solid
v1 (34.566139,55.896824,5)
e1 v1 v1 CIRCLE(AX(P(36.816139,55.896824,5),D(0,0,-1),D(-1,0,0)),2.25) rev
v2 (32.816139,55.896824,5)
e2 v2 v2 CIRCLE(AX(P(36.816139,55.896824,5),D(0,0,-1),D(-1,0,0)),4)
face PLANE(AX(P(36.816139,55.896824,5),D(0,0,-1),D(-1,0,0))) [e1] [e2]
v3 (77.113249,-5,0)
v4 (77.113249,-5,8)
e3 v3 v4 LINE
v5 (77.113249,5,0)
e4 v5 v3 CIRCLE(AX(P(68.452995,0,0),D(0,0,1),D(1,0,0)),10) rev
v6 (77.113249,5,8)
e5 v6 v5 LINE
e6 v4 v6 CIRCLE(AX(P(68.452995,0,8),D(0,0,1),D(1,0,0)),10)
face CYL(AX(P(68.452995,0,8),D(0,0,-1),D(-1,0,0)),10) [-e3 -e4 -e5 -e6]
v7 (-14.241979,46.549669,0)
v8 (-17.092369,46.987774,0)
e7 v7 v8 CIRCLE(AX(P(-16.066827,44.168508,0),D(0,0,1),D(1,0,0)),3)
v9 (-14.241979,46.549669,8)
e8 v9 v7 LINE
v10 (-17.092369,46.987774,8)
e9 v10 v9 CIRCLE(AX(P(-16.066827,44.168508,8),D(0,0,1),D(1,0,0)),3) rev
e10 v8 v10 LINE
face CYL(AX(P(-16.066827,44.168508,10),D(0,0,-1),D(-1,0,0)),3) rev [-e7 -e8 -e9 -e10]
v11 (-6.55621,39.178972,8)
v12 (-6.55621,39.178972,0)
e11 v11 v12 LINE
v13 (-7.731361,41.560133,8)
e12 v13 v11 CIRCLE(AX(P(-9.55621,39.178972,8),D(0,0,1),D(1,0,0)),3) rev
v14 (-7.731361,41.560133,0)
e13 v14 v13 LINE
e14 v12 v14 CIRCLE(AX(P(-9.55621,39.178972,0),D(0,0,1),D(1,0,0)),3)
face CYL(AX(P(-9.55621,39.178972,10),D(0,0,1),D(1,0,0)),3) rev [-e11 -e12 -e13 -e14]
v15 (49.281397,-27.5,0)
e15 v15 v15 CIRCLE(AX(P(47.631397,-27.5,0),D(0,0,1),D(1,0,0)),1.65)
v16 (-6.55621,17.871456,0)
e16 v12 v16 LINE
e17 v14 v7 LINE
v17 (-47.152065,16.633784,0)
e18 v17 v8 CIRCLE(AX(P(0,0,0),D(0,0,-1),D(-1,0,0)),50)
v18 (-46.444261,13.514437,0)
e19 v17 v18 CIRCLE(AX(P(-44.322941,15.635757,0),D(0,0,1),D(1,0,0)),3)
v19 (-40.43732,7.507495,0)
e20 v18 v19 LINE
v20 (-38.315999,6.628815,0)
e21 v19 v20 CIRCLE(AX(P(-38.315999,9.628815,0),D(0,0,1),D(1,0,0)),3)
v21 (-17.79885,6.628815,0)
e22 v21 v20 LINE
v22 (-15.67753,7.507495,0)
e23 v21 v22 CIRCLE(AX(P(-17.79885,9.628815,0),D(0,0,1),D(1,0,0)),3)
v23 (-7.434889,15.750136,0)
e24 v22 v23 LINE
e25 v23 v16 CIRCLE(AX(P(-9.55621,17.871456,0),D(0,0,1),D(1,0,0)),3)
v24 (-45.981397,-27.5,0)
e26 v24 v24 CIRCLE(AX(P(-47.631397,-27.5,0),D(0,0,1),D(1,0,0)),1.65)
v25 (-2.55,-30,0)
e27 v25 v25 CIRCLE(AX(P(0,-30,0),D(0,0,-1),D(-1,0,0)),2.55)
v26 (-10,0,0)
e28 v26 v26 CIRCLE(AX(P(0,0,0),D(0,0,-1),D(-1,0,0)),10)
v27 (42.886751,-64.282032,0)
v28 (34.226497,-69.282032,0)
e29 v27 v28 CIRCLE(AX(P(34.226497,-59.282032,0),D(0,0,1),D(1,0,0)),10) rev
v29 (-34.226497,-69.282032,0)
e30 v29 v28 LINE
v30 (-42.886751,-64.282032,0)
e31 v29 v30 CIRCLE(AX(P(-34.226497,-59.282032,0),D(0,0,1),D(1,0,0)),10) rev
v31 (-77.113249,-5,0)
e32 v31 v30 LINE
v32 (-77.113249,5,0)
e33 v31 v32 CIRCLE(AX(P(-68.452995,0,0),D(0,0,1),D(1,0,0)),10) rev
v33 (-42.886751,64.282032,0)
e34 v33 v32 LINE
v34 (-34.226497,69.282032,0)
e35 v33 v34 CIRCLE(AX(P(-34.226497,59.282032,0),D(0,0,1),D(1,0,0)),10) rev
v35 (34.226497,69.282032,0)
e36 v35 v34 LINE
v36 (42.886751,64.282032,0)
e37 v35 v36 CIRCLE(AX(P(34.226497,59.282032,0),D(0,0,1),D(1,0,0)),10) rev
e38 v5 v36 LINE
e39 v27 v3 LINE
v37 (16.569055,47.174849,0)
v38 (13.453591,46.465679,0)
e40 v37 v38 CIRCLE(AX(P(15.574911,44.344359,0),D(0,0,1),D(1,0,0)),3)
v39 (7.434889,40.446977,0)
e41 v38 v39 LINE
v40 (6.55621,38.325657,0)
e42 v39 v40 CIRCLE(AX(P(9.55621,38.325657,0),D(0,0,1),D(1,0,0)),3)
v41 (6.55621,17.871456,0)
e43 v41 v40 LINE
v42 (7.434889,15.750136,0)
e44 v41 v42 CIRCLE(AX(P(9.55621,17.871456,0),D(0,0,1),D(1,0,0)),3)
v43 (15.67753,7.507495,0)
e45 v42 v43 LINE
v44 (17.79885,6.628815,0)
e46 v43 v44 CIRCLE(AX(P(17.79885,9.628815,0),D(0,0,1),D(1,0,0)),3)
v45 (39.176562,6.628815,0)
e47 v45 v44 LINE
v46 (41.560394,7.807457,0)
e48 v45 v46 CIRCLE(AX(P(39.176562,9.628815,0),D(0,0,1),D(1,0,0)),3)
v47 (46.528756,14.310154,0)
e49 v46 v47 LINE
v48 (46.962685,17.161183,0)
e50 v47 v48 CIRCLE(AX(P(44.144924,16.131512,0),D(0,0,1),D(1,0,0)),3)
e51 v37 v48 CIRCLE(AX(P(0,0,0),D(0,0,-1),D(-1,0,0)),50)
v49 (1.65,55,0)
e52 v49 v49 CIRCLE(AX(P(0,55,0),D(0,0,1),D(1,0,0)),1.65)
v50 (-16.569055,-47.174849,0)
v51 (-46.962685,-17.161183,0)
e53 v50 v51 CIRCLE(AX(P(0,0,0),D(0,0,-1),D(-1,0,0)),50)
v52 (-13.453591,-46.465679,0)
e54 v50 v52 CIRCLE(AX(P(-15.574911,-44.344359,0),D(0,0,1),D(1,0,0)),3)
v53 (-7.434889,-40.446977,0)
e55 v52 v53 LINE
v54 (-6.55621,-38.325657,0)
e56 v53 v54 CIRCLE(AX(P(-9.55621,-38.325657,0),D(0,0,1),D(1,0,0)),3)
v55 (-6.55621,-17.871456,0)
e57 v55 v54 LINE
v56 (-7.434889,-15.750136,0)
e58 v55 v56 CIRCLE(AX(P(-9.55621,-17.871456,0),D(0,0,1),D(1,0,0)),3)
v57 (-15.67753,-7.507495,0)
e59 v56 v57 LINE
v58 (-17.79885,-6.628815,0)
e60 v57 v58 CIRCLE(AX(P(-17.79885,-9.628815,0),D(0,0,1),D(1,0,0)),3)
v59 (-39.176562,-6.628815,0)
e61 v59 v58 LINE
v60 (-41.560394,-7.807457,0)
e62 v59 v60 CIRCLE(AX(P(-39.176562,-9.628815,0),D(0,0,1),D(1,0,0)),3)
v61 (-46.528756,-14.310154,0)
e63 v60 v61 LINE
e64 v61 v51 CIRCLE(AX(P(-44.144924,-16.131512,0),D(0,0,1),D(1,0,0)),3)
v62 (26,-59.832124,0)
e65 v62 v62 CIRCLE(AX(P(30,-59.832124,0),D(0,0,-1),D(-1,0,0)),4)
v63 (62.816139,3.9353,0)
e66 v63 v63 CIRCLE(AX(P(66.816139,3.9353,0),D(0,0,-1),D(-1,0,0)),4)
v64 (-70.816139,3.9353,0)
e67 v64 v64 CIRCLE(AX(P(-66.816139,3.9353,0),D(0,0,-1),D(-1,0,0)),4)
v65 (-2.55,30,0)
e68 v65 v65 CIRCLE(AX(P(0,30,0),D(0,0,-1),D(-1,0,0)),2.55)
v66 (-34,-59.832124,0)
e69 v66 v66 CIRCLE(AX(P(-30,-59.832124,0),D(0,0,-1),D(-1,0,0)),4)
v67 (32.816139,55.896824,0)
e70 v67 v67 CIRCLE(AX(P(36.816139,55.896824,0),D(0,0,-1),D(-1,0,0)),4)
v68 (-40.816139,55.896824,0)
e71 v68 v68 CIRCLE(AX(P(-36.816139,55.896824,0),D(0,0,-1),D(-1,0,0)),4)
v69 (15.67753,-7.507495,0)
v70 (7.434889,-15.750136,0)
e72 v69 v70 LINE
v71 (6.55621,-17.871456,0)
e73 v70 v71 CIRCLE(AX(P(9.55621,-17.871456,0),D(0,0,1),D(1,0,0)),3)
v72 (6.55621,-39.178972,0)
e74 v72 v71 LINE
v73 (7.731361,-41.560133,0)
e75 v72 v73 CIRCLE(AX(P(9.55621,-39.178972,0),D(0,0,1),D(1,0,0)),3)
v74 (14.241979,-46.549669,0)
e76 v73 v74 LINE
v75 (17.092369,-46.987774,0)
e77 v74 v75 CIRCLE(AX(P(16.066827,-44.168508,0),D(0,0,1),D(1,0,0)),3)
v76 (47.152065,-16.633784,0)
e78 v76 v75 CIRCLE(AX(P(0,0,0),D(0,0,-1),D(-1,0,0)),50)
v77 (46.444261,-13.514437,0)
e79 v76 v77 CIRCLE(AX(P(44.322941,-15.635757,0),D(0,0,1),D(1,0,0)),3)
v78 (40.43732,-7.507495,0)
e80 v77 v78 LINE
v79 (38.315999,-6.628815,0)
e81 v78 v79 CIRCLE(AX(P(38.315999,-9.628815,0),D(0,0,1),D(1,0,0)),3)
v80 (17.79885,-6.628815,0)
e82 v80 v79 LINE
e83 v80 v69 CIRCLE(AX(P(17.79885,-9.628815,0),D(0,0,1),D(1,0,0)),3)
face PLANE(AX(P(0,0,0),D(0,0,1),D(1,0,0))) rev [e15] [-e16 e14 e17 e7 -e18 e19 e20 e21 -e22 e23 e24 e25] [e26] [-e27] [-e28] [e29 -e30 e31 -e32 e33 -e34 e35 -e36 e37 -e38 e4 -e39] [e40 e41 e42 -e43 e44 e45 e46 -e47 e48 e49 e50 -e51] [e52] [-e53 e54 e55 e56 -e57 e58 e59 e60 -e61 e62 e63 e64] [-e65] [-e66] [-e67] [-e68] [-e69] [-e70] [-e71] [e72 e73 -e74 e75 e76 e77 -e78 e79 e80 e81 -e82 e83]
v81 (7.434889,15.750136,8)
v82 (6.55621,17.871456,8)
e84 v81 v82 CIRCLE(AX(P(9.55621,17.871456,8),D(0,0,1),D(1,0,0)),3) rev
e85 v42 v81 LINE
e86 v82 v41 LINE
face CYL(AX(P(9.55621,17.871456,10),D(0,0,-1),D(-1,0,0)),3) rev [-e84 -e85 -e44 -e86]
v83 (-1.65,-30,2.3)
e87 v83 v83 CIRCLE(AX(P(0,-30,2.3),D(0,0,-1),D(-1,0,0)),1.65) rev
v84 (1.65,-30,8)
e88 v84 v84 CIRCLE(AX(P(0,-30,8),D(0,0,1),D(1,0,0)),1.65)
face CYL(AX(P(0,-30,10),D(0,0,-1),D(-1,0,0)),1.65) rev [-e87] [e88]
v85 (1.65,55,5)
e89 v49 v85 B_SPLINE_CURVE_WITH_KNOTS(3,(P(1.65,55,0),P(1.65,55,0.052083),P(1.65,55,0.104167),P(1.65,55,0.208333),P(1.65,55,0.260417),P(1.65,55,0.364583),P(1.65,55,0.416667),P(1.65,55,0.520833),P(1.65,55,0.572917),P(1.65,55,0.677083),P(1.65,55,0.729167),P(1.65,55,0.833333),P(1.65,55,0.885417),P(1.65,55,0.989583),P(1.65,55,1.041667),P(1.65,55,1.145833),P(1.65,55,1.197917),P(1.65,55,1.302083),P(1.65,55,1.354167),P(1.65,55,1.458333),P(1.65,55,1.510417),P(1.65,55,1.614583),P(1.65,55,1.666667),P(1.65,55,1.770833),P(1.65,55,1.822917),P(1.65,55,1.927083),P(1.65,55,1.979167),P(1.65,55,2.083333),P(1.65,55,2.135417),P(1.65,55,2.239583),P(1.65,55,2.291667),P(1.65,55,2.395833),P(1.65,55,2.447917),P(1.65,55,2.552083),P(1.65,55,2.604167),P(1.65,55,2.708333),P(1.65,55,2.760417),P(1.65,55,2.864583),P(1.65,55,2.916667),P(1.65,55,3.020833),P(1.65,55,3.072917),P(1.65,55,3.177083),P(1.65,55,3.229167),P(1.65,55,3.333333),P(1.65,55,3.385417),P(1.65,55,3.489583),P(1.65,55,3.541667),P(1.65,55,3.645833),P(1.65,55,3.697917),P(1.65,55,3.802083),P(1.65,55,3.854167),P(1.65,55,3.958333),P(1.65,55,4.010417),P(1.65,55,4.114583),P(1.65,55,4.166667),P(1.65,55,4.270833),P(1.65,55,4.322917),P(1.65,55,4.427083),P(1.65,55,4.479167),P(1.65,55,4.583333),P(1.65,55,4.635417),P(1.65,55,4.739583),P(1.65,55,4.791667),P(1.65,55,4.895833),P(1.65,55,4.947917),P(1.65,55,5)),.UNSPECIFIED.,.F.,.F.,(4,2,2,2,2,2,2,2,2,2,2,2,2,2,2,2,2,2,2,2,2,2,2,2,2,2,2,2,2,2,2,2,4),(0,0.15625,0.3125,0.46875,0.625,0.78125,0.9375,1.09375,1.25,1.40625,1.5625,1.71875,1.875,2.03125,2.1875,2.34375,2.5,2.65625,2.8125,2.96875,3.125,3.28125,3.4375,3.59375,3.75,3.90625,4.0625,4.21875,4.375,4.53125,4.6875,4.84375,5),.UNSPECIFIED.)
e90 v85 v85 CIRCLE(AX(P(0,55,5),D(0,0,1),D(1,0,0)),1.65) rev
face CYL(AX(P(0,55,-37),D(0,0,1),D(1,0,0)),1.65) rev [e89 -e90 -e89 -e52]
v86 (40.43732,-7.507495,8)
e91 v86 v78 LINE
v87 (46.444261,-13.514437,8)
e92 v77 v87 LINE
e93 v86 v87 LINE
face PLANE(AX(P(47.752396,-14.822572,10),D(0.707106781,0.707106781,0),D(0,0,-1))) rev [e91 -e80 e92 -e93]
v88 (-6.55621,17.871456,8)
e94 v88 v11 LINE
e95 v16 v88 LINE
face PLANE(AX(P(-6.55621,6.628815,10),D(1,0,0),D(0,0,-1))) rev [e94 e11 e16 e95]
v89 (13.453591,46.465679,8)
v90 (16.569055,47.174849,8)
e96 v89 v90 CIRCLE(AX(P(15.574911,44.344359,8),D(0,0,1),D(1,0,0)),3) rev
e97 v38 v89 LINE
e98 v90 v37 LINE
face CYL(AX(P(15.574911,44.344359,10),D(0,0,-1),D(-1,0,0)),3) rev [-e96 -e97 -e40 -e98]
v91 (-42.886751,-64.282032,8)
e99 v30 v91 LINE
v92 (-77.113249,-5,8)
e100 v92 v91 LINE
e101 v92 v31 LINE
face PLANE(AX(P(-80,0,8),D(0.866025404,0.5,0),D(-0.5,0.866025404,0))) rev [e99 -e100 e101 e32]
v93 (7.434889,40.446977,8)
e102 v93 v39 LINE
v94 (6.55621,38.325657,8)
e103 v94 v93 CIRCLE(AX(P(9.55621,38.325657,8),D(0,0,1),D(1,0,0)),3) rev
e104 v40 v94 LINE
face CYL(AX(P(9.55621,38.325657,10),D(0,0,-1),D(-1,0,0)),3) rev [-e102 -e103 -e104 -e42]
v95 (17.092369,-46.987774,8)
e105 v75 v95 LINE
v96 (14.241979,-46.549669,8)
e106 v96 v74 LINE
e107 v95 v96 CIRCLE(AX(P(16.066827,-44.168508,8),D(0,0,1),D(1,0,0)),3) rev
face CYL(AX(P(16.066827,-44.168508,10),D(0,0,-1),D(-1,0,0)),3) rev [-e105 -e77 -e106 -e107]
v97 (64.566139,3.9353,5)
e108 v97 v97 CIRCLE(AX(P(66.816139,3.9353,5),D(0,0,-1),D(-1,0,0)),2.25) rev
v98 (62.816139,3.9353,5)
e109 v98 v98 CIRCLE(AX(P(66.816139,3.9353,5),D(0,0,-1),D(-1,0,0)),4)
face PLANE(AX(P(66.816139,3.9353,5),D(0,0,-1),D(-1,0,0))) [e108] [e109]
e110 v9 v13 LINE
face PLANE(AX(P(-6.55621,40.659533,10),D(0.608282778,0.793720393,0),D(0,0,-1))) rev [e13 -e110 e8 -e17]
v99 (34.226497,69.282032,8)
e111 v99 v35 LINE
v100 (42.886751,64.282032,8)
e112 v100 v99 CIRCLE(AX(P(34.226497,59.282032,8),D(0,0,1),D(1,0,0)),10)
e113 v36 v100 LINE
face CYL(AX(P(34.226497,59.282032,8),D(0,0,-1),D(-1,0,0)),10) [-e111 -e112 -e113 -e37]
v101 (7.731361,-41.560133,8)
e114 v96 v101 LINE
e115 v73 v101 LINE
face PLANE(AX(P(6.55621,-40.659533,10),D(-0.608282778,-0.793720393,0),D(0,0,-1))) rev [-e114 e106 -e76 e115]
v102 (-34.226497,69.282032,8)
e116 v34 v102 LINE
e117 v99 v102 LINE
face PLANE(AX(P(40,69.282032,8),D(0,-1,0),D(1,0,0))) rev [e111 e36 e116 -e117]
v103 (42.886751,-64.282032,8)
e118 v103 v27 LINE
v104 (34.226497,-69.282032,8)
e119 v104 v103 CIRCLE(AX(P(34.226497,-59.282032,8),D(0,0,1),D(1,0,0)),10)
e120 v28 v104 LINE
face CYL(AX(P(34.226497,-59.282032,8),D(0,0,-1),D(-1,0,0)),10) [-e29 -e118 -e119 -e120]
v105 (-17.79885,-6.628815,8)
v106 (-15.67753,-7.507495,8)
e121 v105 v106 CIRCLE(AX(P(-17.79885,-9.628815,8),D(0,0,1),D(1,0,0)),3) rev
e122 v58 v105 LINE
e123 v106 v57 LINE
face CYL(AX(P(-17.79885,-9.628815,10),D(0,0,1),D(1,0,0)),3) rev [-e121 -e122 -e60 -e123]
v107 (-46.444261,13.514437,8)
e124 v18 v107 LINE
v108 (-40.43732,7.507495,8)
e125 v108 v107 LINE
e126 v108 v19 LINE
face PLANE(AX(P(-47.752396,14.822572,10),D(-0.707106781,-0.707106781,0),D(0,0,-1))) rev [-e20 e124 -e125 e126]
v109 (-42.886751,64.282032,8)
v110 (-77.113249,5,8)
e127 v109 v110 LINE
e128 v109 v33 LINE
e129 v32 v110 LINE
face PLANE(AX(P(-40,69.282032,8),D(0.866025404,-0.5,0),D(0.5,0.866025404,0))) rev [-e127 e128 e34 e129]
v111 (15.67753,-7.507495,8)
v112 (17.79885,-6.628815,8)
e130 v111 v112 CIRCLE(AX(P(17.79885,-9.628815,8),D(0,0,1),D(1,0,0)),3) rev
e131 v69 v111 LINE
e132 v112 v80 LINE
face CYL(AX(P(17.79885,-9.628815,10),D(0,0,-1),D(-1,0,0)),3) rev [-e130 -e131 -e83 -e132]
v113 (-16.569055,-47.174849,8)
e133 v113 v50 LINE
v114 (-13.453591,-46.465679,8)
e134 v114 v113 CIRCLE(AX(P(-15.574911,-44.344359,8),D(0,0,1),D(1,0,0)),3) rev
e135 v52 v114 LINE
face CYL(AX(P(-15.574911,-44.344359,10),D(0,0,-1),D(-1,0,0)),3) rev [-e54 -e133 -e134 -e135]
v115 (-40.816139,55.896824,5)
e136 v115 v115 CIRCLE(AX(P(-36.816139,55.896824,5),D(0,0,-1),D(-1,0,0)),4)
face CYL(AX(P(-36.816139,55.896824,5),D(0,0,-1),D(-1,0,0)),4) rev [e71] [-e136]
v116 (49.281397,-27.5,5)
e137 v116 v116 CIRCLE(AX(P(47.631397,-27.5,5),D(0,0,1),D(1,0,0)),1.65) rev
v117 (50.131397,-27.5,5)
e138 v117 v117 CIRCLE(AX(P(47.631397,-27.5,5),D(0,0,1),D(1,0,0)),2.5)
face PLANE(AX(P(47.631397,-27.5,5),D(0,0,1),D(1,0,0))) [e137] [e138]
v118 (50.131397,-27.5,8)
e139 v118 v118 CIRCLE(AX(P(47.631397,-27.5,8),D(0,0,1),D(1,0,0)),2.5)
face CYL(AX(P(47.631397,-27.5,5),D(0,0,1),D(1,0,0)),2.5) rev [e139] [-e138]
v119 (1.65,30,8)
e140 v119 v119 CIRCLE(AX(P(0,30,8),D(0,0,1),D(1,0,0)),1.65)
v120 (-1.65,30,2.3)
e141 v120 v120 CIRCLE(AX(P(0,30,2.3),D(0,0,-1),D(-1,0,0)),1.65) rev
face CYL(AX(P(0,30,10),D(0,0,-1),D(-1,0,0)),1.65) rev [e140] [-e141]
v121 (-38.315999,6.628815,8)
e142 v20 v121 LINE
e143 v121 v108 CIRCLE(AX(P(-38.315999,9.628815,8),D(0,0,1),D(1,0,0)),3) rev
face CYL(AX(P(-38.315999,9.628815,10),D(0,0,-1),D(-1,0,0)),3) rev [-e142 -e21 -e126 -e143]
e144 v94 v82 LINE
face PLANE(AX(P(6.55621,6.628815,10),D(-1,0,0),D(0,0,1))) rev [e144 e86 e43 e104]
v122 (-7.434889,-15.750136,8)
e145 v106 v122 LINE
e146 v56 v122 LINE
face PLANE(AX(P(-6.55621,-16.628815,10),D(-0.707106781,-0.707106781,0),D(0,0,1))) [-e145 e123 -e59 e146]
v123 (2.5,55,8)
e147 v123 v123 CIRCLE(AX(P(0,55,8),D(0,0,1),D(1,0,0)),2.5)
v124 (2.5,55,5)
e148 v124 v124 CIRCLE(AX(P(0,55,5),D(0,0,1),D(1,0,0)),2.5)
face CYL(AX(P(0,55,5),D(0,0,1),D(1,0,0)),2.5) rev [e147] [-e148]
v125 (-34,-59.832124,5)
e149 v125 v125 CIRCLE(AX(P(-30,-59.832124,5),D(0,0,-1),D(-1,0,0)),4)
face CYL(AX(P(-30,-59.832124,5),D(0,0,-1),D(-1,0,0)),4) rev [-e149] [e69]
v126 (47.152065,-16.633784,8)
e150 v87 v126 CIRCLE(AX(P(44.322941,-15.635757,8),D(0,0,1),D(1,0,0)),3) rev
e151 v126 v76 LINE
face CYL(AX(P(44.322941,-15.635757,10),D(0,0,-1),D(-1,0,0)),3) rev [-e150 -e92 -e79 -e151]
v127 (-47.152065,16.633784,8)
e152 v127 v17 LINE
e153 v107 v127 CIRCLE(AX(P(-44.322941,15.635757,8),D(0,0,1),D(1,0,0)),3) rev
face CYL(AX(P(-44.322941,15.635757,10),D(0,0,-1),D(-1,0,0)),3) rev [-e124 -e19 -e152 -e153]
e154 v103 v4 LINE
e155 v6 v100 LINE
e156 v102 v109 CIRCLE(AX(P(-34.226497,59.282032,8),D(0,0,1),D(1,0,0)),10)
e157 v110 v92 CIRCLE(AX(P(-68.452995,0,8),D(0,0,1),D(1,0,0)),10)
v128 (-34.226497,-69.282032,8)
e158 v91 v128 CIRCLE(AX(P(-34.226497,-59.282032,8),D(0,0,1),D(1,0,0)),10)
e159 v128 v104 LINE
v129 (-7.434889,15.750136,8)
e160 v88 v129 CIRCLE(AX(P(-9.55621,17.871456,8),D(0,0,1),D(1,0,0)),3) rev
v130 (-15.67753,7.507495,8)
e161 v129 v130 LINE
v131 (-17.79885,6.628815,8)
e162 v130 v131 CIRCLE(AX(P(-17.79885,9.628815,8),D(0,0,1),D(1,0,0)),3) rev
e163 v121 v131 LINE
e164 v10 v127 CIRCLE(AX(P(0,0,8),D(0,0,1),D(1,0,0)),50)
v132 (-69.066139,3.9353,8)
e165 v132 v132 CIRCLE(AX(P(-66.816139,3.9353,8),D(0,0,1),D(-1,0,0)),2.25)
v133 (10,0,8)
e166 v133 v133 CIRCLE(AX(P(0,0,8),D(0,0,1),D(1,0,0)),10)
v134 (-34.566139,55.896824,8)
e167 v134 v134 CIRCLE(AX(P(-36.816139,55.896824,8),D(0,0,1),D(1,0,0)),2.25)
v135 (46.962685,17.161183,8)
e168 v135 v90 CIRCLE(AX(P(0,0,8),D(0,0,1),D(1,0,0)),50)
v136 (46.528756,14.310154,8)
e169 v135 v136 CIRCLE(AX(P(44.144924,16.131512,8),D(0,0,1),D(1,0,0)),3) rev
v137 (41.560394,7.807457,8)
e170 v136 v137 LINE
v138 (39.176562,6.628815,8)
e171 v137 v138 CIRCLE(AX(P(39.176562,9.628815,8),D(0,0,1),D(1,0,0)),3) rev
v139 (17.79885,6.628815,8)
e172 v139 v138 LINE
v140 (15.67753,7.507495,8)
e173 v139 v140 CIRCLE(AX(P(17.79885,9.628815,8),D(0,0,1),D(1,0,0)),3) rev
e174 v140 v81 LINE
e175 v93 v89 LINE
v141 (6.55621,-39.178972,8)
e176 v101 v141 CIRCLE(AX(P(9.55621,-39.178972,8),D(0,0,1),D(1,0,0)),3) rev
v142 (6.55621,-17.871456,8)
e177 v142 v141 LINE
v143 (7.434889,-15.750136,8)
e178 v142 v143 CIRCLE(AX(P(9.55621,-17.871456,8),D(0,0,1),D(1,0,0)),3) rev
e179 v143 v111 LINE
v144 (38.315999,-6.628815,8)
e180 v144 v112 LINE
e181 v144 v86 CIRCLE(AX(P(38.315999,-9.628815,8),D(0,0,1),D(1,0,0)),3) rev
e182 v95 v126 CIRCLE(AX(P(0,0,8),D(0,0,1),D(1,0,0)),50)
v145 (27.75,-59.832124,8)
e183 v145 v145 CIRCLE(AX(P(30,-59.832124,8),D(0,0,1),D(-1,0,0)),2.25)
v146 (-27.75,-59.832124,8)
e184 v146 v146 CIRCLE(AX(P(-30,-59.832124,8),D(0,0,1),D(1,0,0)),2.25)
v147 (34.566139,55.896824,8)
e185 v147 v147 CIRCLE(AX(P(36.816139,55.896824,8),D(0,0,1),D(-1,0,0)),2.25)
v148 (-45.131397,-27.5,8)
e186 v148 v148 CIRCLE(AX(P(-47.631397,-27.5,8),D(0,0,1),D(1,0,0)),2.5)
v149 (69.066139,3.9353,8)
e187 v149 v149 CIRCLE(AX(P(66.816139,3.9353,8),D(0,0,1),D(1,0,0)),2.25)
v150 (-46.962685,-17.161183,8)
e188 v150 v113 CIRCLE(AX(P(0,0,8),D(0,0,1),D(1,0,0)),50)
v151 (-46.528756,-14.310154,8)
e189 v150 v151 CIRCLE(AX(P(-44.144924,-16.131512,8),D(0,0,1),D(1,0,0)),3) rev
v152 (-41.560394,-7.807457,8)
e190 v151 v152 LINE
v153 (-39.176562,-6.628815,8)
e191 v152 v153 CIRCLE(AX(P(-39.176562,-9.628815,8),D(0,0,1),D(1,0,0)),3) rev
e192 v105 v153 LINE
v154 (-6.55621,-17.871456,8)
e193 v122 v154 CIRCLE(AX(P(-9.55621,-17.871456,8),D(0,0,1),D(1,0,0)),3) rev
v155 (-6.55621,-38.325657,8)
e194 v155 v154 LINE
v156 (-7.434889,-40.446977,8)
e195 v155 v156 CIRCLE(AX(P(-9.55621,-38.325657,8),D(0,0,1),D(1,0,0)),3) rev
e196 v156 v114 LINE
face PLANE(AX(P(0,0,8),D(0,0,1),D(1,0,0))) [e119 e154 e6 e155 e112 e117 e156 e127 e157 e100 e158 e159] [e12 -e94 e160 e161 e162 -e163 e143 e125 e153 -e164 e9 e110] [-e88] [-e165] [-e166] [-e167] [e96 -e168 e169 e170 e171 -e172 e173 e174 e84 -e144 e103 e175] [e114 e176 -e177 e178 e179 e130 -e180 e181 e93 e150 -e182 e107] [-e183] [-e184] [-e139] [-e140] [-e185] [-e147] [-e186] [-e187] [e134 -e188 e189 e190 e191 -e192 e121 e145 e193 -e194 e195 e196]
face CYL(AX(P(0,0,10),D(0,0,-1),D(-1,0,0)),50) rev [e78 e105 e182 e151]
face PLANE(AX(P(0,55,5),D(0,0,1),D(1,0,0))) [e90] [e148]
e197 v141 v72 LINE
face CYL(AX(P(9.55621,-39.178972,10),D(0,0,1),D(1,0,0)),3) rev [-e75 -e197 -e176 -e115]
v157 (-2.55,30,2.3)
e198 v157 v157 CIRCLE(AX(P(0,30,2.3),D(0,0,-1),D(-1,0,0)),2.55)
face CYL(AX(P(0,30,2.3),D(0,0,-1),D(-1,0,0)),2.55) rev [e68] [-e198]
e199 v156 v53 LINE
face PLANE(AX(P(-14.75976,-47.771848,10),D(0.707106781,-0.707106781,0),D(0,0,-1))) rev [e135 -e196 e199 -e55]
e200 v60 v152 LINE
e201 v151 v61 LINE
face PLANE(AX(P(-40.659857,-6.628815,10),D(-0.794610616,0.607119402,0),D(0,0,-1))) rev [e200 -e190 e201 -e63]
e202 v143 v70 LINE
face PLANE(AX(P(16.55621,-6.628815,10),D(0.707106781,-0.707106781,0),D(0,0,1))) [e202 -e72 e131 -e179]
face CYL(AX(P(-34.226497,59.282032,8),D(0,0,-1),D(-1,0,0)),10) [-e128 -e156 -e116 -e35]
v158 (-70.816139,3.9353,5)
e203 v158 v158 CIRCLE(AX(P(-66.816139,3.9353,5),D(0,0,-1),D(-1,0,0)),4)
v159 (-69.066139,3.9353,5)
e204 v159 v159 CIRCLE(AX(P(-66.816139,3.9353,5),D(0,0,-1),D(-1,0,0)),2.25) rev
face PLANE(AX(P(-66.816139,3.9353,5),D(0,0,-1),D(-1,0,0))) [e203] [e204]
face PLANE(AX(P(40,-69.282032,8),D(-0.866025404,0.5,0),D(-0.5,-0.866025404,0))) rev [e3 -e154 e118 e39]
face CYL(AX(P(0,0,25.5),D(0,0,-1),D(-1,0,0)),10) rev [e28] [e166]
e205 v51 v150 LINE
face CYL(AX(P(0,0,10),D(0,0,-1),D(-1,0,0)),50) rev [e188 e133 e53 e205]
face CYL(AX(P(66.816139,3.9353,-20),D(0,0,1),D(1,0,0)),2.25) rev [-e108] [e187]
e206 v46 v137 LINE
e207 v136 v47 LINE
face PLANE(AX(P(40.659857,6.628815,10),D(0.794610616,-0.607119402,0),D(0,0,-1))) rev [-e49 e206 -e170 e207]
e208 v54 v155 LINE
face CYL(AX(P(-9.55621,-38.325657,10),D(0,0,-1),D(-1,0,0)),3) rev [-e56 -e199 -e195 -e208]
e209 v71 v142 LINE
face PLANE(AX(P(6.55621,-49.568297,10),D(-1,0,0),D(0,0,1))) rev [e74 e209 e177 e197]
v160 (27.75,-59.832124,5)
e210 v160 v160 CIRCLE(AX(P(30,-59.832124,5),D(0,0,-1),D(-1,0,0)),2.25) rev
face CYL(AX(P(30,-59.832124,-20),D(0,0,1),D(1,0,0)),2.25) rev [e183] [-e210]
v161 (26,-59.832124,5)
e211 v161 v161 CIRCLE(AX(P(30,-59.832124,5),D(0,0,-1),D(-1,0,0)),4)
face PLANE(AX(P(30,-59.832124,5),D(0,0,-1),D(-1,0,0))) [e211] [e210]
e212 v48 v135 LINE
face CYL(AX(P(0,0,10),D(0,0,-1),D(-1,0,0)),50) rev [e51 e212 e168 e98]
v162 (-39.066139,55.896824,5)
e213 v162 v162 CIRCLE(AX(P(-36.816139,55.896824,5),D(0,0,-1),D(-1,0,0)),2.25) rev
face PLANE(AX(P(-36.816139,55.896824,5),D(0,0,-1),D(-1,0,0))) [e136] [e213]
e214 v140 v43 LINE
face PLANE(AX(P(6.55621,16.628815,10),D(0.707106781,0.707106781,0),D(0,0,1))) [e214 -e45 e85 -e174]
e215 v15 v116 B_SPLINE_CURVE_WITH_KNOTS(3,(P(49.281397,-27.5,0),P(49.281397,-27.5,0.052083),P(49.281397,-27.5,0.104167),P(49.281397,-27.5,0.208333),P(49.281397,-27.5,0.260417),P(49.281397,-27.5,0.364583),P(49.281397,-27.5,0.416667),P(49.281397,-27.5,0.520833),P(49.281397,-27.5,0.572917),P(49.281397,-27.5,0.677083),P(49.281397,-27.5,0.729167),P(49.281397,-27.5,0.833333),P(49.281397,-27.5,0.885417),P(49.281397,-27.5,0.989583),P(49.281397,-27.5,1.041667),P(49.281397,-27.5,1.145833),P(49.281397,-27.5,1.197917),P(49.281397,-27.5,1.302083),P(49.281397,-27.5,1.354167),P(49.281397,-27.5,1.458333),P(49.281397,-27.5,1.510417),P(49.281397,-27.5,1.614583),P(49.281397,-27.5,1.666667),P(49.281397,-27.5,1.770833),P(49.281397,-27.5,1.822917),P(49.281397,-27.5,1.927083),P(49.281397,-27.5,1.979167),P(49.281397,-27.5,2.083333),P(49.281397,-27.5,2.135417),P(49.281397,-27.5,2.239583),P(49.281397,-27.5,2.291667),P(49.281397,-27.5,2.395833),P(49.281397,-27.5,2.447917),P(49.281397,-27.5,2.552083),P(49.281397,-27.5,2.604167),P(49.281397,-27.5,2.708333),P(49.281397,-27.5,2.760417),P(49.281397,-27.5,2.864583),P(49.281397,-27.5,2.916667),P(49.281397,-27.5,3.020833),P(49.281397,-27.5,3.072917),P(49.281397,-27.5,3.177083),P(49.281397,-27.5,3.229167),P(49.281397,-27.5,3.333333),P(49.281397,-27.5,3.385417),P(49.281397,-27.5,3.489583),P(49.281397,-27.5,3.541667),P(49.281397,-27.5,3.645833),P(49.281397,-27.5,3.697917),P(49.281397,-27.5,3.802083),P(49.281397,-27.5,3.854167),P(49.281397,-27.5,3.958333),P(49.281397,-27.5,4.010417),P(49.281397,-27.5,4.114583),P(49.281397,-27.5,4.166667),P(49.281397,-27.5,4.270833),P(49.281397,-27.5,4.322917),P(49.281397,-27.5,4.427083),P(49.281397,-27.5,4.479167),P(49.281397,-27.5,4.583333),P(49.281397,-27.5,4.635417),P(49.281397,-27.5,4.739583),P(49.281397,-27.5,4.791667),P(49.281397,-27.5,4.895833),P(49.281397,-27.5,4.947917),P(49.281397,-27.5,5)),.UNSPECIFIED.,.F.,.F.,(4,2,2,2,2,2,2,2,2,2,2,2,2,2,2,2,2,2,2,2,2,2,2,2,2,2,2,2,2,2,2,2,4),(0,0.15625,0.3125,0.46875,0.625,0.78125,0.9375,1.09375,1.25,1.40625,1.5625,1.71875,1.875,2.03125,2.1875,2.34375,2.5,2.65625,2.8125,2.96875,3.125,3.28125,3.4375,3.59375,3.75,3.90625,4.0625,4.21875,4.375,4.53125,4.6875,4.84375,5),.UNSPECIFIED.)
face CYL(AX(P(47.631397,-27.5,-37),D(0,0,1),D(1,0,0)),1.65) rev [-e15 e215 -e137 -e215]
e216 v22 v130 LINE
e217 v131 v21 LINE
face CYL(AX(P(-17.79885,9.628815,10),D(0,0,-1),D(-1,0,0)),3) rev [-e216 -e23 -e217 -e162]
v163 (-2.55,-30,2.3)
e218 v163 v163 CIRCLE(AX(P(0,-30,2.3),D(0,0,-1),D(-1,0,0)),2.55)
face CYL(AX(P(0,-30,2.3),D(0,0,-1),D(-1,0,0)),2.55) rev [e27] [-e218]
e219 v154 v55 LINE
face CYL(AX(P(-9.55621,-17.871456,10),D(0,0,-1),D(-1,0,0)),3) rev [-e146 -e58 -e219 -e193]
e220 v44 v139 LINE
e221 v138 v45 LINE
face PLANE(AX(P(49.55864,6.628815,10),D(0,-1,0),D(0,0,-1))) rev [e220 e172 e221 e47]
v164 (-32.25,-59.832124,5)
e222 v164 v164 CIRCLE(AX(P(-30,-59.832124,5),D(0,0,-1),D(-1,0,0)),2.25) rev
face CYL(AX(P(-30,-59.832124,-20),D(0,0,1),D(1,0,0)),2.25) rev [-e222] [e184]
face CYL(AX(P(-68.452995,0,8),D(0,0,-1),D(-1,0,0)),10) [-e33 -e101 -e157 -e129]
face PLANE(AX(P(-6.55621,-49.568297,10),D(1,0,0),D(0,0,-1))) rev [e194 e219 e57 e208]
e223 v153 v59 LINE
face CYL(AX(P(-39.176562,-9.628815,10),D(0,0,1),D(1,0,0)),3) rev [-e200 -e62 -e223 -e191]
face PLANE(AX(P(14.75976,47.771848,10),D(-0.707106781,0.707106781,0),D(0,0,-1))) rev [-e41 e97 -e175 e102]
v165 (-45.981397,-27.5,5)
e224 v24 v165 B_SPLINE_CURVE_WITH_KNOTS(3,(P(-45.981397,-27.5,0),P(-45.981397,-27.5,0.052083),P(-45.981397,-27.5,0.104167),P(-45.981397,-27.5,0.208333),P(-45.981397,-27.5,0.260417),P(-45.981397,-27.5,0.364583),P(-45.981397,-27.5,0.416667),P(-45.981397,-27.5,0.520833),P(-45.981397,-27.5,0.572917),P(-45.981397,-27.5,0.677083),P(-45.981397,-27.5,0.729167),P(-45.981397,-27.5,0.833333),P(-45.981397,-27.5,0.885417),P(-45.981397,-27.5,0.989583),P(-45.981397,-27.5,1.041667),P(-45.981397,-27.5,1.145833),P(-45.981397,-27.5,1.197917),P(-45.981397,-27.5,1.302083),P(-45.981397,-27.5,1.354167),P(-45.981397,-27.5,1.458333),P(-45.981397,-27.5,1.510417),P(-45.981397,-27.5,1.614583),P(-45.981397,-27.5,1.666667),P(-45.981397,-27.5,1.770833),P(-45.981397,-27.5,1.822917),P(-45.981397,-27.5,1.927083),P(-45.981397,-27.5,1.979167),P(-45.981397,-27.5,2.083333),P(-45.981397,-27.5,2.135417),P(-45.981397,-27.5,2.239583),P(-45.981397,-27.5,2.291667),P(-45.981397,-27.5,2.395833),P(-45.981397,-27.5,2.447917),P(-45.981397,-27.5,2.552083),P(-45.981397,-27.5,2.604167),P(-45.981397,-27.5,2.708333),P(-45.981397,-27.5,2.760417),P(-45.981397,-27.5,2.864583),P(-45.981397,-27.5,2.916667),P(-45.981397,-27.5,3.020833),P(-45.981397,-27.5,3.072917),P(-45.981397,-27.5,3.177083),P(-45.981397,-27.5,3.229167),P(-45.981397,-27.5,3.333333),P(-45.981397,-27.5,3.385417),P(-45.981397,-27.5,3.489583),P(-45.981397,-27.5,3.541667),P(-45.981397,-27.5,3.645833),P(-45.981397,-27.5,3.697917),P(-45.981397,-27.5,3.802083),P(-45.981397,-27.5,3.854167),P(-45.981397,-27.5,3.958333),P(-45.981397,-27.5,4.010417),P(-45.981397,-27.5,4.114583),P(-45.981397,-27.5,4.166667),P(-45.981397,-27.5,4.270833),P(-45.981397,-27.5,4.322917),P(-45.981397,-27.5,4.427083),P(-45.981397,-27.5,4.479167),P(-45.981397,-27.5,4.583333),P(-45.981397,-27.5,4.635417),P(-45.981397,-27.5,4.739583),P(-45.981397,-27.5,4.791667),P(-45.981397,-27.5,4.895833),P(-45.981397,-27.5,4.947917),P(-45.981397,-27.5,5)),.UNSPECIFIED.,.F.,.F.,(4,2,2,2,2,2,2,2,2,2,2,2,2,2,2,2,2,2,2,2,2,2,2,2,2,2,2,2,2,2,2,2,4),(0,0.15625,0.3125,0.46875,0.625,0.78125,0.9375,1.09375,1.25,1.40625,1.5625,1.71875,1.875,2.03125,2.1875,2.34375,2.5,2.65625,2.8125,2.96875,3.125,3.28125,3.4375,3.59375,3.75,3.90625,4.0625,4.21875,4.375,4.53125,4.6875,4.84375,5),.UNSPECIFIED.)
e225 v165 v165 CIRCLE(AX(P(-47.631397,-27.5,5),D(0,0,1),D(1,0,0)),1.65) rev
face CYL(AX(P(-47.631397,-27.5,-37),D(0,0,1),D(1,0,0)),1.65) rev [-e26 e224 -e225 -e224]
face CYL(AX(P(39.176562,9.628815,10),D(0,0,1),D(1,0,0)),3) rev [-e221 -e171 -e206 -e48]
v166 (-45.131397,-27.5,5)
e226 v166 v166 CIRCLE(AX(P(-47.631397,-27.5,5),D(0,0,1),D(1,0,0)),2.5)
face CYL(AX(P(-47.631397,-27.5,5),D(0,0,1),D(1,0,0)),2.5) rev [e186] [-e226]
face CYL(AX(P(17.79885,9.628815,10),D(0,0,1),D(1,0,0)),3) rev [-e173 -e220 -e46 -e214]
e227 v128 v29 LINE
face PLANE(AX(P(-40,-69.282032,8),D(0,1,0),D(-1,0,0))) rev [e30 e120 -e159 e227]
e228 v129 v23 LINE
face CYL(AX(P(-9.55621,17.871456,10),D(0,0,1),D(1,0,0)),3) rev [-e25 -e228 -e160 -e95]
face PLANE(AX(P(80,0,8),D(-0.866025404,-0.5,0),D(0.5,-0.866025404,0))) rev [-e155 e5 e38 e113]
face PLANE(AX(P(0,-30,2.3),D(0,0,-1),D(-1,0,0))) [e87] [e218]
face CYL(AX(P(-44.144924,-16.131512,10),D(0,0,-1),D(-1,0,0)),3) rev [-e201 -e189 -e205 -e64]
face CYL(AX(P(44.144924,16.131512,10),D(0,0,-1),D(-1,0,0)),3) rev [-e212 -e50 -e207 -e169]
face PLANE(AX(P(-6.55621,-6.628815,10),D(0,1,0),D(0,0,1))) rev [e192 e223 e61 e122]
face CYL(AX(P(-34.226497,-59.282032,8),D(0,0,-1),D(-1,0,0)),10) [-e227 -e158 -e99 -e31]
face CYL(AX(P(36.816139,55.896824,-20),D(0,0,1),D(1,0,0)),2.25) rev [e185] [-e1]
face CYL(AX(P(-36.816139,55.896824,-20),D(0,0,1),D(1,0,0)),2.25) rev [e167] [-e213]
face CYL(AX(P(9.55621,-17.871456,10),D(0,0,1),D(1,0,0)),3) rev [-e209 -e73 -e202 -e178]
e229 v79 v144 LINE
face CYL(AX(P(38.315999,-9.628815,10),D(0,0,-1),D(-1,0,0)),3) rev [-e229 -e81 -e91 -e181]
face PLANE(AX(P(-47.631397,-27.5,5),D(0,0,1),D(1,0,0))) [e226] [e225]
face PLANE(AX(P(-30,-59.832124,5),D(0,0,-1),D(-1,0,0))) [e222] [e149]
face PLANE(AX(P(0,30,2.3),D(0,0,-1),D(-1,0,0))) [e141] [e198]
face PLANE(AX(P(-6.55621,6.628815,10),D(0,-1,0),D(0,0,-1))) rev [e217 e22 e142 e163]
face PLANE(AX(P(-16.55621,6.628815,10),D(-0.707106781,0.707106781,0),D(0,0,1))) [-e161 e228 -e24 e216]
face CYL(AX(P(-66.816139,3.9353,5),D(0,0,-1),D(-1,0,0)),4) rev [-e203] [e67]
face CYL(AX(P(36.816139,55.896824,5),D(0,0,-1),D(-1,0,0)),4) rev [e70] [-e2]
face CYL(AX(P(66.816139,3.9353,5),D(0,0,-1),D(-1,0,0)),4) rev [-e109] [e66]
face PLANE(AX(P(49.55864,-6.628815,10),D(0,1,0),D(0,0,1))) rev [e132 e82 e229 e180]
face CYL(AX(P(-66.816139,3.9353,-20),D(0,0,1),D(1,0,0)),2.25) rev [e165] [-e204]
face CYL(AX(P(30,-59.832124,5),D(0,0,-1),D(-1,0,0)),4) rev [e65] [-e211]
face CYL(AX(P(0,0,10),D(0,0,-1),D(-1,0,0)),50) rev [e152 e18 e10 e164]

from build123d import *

# Parameters (mm, degrees)
BOSS_EXTRUDE1_DEPTH = 8
SKETCH2_R           = 2.25
CUT_EXTRUDE1_DEPTH  = 28
FILLET1_R           = 10
SKETCH5_R           = 1.65
CUT_EXTRUDE3_DEPTH  = 45
SKETCH10_R          = 4
CUT_EXTRUDE4_DEPTH  = 5
CUT_EXTRUDE5_DEPTH  = 10
CHAMFER1_SIZE       = 8.908764189
CHAMFER1_SIZE_2     = 10
CHAMFER1_SIZE_3     = 8.898783464
SKETCH12_R          = 10
CUT_EXTRUDE6_DEPTH  = 25.5
SKETCH13_R          = 1.65
CUT_EXTRUDE7_DEPTH  = 10
SKETCH14_R          = 2.55
CUT_EXTRUDE8_DEPTH  = 2.3
FILLET2_R           = 3
SKETCH15_R          = 2.5
CUT_EXTRUDE9_DEPTH  = 3


with BuildPart() as part:
    # Sketch1 → Boss-Extrude1 (new body)
    with BuildSketch(Plane.XY):
        Polygon((40, 69.282032303), (-40, 69.282032303), (-80, 0), (-40, -69.282032303), (40, -69.282032303), (80, 0), align=None)
    extrude(amount=BOSS_EXTRUDE1_DEPTH)

    # Sketch2 → Cut-Extrude1 (cut)
    with BuildSketch(Plane.XY.offset(8)):
        with Locations((-36.81613895, 55.896823885)):
            Circle(SKETCH2_R)
        with Locations((-66.81613895, 3.935299658)):
            Circle(SKETCH2_R)
        with Locations((36.81613895, 55.896823885)):
            Circle(SKETCH2_R)
        with Locations((66.81613895, 3.935299658)):
            Circle(SKETCH2_R)
        with Locations((30, -59.832123543)):
            Circle(SKETCH2_R)
        with Locations((-30, -59.832123543)):
            Circle(SKETCH2_R)
    extrude(amount=-CUT_EXTRUDE1_DEPTH, mode=Mode.SUBTRACT)

    # Fillet1
    fillet1_edges = [part.edges().sort_by_distance(p)[0] for p in [
        (80, 0, 4),
        (40, -69.282032303, 4),
        (-40, -69.282032303, 4),
        (-80, 0, 4),
        (-40, 69.282032303, 4),
        (40, 69.282032303, 4),
    ]]
    fillet(fillet1_edges, radius=FILLET1_R)

    # Sketch5 → Cut-Extrude3 (cut)
    with BuildSketch(Plane.XY.offset(8)):
        with Locations((0, 55)):
            Circle(SKETCH5_R)
        with Locations((47.631397208, -27.5)):
            Circle(SKETCH5_R)
        with Locations((-47.631397208, -27.5)):
            Circle(SKETCH5_R)
    extrude(amount=-CUT_EXTRUDE3_DEPTH, mode=Mode.SUBTRACT)

    # Sketch10 → Cut-Extrude4 (cut)
    with BuildSketch(Plane(origin=(0, 0, 0), x_dir=(-1, 0, 0), z_dir=(0, 0, -1))):
        with Locations((-30, -59.832123543)):
            Circle(SKETCH10_R)
        with Locations((-66.81613895, 3.935299658)):
            Circle(SKETCH10_R)
        with Locations((-36.81613895, 55.896823885)):
            Circle(SKETCH10_R)
        with Locations((36.81613895, 55.896823885)):
            Circle(SKETCH10_R)
        with Locations((66.81613895, 3.935299658)):
            Circle(SKETCH10_R)
        with Locations((30, -59.832123543)):
            Circle(SKETCH10_R)
    extrude(amount=-CUT_EXTRUDE4_DEPTH, mode=Mode.SUBTRACT)

    # Sketch11 → Cut-Extrude5 (cut)
    with BuildSketch(Plane(origin=(0, 0, 0), x_dir=(-1, 0, 0), z_dir=(0, 0, -1))):
        with BuildLine():
            Line((-6.556209751, -49.568297466), (-6.556209751, -6.628815438))
            Line((-6.556209751, -6.628815438), (-49.558640073, -6.628815438))
            ThreePointArc((-49.558640073, -6.628815438), (-35.329433507, -35.381225644), (-6.556209751, -49.568297466))
        make_face()
        with BuildLine():
            Line((6.556209751, -49.568297466), (6.556209751, -6.628815438))
            Line((6.556209751, -6.628815438), (49.558640073, -6.628815438))
            ThreePointArc((49.558640073, -6.628815438), (35.329433507, -35.381225644), (6.556209751, -49.568297466))
        make_face()
        with BuildLine():
            Line((-49.558640073, 6.628815438), (-6.556209751, 6.628815438))
            Line((-6.556209751, 6.628815438), (-6.556209751, 49.568297466))
            ThreePointArc((-6.556209751, 49.568297466), (-35.329433507, 35.381225644), (-49.558640073, 6.628815438))
        make_face()
        with BuildLine():
            Line((6.556209751, 6.628815438), (49.558640073, 6.628815438))
            ThreePointArc((49.558640073, 6.628815438), (35.329433507, 35.381225644), (6.556209751, 49.568297466))
            Line((6.556209751, 49.568297466), (6.556209751, 6.628815438))
        make_face()
    extrude(amount=-CUT_EXTRUDE5_DEPTH, mode=Mode.SUBTRACT)

    # Chamfer1
    # the kernel refuses this chamfer: 10, 8.908764189, 8.898783464 mm, written as the material it adds along each edge
    with BuildSketch(Plane(origin=(-6.556209751, 49.568297466, 0), x_dir=(-0.9751121847064436, -0.22171203674367113, 0), z_dir=(0, 0, 1)), Plane(origin=(6.556209751, -49.568297466, 0), x_dir=(0.9751121847064436, 0.22171203674367113, 0), z_dir=(0, 0, 1))) as chamfer1_piece_1:
        with BuildLine():
            Line((9.19369635, 0), (CHAMFER1_SIZE * 0.221712036732, CHAMFER1_SIZE * 0.975112184657))
            Line((CHAMFER1_SIZE * 0.221712036732, CHAMFER1_SIZE * 0.975112184657), (0, 0))
            ThreePointArc((0, 0), (4.724816594, -0.211594789), (9.19369635, 0))
        make_face()
    extrude(amount=8)
    with BuildSketch(Plane(origin=(-49.558640073, 6.628815438, 0), x_dir=(0.2152729733414999, 0.9765539139999951, 0), z_dir=(0, 0, 1)), Plane(origin=(49.558640073, -6.628815438, 0), x_dir=(-0.2152729733414999, -0.9765539139999951, 0), z_dir=(0, 0, 1))) as chamfer1_piece_2:
        with BuildLine():
            Line((8.390480284, 0), (CHAMFER1_SIZE_2 * 0.215272973341, -CHAMFER1_SIZE_2 * 0.976553914))
            Line((CHAMFER1_SIZE_2 * 0.215272973341, -CHAMFER1_SIZE_2 * 0.976553914), (0, 0))
            ThreePointArc((0, 0), (4.30291799, 0.17619531), (8.390480284, 0))
        make_face()
    extrude(amount=8)
    with BuildSketch(Plane(origin=(-6.556209751, 6.628815438, 0), x_dir=(-1, 0, 0), z_dir=(0, 0, 1)), Plane(origin=(-6.556209751, -6.628815438, 0), x_dir=(0, -1, 0), z_dir=(0, 0, 1)), Plane(origin=(6.556209751, -6.628815438, 0), x_dir=(1, 0, 0), z_dir=(0, 0, 1)), Plane(origin=(6.556209751, 6.628815438, 0), x_dir=(0, 1, 0), z_dir=(0, 0, 1))) as chamfer1_piece_3:
        Polygon((CHAMFER1_SIZE_2, 0), (0, -CHAMFER1_SIZE_2), (0, 0), align=None)
    extrude(amount=8)
    with BuildSketch(Plane(origin=(-49.558640073, -6.628815438, 0), x_dir=(0.22314024310111003, -0.9747863519298869, 0), z_dir=(0, 0, 1))) as chamfer1_piece_4:
        with BuildLine():
            Line((9.19369635, 0), (CHAMFER1_SIZE_3 * 0.223140243107, CHAMFER1_SIZE_3 * 0.974786351955))
            Line((CHAMFER1_SIZE_3 * 0.223140243107, CHAMFER1_SIZE_3 * 0.974786351955), (0, 0))
            ThreePointArc((0, 0), (4.724816594, -0.211594789), (9.19369635, 0))
        make_face()
    extrude(amount=8)
    with BuildSketch(Plane(origin=(-6.556209751, -49.568297466, 0), x_dir=(-0.9768521989550364, 0.21391536035710523, 0), z_dir=(0, 0, 1))) as chamfer1_piece_5:
        with BuildLine():
            Line((8.397944605, 0), (CHAMFER1_SIZE_2 * 0.213915360357, -CHAMFER1_SIZE_2 * 0.976852198955))
            Line((CHAMFER1_SIZE_2 * 0.213915360357, -CHAMFER1_SIZE_2 * 0.976852198955), (0, 0))
            ThreePointArc((0, 0), (4.306885367, 0.176509198), (8.397944605, 0))
        make_face()
    extrude(amount=8)
    with BuildSketch(Plane(origin=(6.556209751, 49.568297466, 0), x_dir=(0, -1, 0), z_dir=(0, 0, 1))) as chamfer1_piece_6:
        with BuildLine():
            Line((CHAMFER1_SIZE_2, 0), (1.796449346, 8.203550654))
            ThreePointArc((1.796449346, 8.203550654), (0.748885537, 4.24494847), (0, 0))
            Line((0, 0), (CHAMFER1_SIZE_2, 0))
        make_face()
    extrude(amount=8)
    with BuildSketch(Plane(origin=(49.558640073, 6.628815438, 0), x_dir=(-1, 0, 0), z_dir=(0, 0, 1))) as chamfer1_piece_7:
        with BuildLine():
            Line((CHAMFER1_SIZE_3, 0), (2.051483639, -8.961889726))
            ThreePointArc((2.051483639, -8.961889726), (0.848037011, -4.652902044), (0, 0))
            Line((0, 0), (CHAMFER1_SIZE_3, 0))
        make_face()
    extrude(amount=8)

    # Sketch12 → Cut-Extrude6 (cut)
    with BuildSketch(Plane(origin=(0, 0, 0), x_dir=(-1, 0, 0), z_dir=(0, 0, -1))):
        Circle(SKETCH12_R)
    extrude(amount=-CUT_EXTRUDE6_DEPTH, mode=Mode.SUBTRACT)

    # Sketch13 → Cut-Extrude7 (cut)
    with BuildSketch(Plane(origin=(0, 0, 0), x_dir=(-1, 0, 0), z_dir=(0, 0, -1))):
        with Locations((0, 30)):
            Circle(SKETCH13_R)
        with Locations(Location((0, -30, 0), (0, 0, 180))):
            Circle(SKETCH13_R)
    extrude(amount=-CUT_EXTRUDE7_DEPTH, mode=Mode.SUBTRACT)

    # Sketch14 → Cut-Extrude8 (cut)
    with BuildSketch(Plane(origin=(0, 0, 0), x_dir=(-1, 0, 0), z_dir=(0, 0, -1))):
        with Locations((0, -30)):
            Circle(SKETCH14_R)
        with Locations((0, 30)):
            Circle(SKETCH14_R)
    extrude(amount=-CUT_EXTRUDE8_DEPTH, mode=Mode.SUBTRACT)

    # Fillet2
    fillet2_edges = [part.edges().sort_by_distance(p)[0] for p in [
        (-6.556209751, -39.568297466, 4),
        (-6.556209751, -16.628815438, 4),
        (-40.659856609, -6.628815438, 4),
        (-16.556209751, -6.628815438, 4),
        (-14.759760405, -47.77184812, 4),
        (-47.507156434, -15.590705164, 4),
        (6.556209751, -16.628815438, 4),
        (6.556209751, -40.659533278, 4),
        (47.752396435, -14.8225718, 4),
        (15.521095085, -47.529944323, 4),
        (39.558640073, -6.628815438, 4),
        (16.556209751, -6.628815438, 4),
        (47.507156434, 15.590705164, 4),
        (14.759760405, 47.77184812, 4),
        (6.556209751, 16.628815438, 4),
        (6.556209751, 39.568297466, 4),
        (16.556209751, 6.628815438, 4),
        (40.659856609, 6.628815438, 4),
        (-15.521095085, 47.529944323, 4),
        (-47.752396435, 14.8225718, 4),
        (-16.556209751, 6.628815438, 4),
        (-39.558640073, 6.628815438, 4),
        (-6.556209751, 40.659533278, 4),
        (-6.556209751, 16.628815438, 4),
    ]]
    fillet(fillet2_edges, radius=FILLET2_R)

    # Sketch15 → Cut-Extrude9 (cut)
    with BuildSketch(Plane.XY.offset(8)):
        with Locations((-47.631397208, -27.5)):
            Circle(SKETCH15_R)
        with Locations((0, 55)):
            Circle(SKETCH15_R)
        with Locations((47.631397208, -27.5)):
            Circle(SKETCH15_R)
    extrude(amount=-CUT_EXTRUDE9_DEPTH, mode=Mode.SUBTRACT)


solid = part.part
